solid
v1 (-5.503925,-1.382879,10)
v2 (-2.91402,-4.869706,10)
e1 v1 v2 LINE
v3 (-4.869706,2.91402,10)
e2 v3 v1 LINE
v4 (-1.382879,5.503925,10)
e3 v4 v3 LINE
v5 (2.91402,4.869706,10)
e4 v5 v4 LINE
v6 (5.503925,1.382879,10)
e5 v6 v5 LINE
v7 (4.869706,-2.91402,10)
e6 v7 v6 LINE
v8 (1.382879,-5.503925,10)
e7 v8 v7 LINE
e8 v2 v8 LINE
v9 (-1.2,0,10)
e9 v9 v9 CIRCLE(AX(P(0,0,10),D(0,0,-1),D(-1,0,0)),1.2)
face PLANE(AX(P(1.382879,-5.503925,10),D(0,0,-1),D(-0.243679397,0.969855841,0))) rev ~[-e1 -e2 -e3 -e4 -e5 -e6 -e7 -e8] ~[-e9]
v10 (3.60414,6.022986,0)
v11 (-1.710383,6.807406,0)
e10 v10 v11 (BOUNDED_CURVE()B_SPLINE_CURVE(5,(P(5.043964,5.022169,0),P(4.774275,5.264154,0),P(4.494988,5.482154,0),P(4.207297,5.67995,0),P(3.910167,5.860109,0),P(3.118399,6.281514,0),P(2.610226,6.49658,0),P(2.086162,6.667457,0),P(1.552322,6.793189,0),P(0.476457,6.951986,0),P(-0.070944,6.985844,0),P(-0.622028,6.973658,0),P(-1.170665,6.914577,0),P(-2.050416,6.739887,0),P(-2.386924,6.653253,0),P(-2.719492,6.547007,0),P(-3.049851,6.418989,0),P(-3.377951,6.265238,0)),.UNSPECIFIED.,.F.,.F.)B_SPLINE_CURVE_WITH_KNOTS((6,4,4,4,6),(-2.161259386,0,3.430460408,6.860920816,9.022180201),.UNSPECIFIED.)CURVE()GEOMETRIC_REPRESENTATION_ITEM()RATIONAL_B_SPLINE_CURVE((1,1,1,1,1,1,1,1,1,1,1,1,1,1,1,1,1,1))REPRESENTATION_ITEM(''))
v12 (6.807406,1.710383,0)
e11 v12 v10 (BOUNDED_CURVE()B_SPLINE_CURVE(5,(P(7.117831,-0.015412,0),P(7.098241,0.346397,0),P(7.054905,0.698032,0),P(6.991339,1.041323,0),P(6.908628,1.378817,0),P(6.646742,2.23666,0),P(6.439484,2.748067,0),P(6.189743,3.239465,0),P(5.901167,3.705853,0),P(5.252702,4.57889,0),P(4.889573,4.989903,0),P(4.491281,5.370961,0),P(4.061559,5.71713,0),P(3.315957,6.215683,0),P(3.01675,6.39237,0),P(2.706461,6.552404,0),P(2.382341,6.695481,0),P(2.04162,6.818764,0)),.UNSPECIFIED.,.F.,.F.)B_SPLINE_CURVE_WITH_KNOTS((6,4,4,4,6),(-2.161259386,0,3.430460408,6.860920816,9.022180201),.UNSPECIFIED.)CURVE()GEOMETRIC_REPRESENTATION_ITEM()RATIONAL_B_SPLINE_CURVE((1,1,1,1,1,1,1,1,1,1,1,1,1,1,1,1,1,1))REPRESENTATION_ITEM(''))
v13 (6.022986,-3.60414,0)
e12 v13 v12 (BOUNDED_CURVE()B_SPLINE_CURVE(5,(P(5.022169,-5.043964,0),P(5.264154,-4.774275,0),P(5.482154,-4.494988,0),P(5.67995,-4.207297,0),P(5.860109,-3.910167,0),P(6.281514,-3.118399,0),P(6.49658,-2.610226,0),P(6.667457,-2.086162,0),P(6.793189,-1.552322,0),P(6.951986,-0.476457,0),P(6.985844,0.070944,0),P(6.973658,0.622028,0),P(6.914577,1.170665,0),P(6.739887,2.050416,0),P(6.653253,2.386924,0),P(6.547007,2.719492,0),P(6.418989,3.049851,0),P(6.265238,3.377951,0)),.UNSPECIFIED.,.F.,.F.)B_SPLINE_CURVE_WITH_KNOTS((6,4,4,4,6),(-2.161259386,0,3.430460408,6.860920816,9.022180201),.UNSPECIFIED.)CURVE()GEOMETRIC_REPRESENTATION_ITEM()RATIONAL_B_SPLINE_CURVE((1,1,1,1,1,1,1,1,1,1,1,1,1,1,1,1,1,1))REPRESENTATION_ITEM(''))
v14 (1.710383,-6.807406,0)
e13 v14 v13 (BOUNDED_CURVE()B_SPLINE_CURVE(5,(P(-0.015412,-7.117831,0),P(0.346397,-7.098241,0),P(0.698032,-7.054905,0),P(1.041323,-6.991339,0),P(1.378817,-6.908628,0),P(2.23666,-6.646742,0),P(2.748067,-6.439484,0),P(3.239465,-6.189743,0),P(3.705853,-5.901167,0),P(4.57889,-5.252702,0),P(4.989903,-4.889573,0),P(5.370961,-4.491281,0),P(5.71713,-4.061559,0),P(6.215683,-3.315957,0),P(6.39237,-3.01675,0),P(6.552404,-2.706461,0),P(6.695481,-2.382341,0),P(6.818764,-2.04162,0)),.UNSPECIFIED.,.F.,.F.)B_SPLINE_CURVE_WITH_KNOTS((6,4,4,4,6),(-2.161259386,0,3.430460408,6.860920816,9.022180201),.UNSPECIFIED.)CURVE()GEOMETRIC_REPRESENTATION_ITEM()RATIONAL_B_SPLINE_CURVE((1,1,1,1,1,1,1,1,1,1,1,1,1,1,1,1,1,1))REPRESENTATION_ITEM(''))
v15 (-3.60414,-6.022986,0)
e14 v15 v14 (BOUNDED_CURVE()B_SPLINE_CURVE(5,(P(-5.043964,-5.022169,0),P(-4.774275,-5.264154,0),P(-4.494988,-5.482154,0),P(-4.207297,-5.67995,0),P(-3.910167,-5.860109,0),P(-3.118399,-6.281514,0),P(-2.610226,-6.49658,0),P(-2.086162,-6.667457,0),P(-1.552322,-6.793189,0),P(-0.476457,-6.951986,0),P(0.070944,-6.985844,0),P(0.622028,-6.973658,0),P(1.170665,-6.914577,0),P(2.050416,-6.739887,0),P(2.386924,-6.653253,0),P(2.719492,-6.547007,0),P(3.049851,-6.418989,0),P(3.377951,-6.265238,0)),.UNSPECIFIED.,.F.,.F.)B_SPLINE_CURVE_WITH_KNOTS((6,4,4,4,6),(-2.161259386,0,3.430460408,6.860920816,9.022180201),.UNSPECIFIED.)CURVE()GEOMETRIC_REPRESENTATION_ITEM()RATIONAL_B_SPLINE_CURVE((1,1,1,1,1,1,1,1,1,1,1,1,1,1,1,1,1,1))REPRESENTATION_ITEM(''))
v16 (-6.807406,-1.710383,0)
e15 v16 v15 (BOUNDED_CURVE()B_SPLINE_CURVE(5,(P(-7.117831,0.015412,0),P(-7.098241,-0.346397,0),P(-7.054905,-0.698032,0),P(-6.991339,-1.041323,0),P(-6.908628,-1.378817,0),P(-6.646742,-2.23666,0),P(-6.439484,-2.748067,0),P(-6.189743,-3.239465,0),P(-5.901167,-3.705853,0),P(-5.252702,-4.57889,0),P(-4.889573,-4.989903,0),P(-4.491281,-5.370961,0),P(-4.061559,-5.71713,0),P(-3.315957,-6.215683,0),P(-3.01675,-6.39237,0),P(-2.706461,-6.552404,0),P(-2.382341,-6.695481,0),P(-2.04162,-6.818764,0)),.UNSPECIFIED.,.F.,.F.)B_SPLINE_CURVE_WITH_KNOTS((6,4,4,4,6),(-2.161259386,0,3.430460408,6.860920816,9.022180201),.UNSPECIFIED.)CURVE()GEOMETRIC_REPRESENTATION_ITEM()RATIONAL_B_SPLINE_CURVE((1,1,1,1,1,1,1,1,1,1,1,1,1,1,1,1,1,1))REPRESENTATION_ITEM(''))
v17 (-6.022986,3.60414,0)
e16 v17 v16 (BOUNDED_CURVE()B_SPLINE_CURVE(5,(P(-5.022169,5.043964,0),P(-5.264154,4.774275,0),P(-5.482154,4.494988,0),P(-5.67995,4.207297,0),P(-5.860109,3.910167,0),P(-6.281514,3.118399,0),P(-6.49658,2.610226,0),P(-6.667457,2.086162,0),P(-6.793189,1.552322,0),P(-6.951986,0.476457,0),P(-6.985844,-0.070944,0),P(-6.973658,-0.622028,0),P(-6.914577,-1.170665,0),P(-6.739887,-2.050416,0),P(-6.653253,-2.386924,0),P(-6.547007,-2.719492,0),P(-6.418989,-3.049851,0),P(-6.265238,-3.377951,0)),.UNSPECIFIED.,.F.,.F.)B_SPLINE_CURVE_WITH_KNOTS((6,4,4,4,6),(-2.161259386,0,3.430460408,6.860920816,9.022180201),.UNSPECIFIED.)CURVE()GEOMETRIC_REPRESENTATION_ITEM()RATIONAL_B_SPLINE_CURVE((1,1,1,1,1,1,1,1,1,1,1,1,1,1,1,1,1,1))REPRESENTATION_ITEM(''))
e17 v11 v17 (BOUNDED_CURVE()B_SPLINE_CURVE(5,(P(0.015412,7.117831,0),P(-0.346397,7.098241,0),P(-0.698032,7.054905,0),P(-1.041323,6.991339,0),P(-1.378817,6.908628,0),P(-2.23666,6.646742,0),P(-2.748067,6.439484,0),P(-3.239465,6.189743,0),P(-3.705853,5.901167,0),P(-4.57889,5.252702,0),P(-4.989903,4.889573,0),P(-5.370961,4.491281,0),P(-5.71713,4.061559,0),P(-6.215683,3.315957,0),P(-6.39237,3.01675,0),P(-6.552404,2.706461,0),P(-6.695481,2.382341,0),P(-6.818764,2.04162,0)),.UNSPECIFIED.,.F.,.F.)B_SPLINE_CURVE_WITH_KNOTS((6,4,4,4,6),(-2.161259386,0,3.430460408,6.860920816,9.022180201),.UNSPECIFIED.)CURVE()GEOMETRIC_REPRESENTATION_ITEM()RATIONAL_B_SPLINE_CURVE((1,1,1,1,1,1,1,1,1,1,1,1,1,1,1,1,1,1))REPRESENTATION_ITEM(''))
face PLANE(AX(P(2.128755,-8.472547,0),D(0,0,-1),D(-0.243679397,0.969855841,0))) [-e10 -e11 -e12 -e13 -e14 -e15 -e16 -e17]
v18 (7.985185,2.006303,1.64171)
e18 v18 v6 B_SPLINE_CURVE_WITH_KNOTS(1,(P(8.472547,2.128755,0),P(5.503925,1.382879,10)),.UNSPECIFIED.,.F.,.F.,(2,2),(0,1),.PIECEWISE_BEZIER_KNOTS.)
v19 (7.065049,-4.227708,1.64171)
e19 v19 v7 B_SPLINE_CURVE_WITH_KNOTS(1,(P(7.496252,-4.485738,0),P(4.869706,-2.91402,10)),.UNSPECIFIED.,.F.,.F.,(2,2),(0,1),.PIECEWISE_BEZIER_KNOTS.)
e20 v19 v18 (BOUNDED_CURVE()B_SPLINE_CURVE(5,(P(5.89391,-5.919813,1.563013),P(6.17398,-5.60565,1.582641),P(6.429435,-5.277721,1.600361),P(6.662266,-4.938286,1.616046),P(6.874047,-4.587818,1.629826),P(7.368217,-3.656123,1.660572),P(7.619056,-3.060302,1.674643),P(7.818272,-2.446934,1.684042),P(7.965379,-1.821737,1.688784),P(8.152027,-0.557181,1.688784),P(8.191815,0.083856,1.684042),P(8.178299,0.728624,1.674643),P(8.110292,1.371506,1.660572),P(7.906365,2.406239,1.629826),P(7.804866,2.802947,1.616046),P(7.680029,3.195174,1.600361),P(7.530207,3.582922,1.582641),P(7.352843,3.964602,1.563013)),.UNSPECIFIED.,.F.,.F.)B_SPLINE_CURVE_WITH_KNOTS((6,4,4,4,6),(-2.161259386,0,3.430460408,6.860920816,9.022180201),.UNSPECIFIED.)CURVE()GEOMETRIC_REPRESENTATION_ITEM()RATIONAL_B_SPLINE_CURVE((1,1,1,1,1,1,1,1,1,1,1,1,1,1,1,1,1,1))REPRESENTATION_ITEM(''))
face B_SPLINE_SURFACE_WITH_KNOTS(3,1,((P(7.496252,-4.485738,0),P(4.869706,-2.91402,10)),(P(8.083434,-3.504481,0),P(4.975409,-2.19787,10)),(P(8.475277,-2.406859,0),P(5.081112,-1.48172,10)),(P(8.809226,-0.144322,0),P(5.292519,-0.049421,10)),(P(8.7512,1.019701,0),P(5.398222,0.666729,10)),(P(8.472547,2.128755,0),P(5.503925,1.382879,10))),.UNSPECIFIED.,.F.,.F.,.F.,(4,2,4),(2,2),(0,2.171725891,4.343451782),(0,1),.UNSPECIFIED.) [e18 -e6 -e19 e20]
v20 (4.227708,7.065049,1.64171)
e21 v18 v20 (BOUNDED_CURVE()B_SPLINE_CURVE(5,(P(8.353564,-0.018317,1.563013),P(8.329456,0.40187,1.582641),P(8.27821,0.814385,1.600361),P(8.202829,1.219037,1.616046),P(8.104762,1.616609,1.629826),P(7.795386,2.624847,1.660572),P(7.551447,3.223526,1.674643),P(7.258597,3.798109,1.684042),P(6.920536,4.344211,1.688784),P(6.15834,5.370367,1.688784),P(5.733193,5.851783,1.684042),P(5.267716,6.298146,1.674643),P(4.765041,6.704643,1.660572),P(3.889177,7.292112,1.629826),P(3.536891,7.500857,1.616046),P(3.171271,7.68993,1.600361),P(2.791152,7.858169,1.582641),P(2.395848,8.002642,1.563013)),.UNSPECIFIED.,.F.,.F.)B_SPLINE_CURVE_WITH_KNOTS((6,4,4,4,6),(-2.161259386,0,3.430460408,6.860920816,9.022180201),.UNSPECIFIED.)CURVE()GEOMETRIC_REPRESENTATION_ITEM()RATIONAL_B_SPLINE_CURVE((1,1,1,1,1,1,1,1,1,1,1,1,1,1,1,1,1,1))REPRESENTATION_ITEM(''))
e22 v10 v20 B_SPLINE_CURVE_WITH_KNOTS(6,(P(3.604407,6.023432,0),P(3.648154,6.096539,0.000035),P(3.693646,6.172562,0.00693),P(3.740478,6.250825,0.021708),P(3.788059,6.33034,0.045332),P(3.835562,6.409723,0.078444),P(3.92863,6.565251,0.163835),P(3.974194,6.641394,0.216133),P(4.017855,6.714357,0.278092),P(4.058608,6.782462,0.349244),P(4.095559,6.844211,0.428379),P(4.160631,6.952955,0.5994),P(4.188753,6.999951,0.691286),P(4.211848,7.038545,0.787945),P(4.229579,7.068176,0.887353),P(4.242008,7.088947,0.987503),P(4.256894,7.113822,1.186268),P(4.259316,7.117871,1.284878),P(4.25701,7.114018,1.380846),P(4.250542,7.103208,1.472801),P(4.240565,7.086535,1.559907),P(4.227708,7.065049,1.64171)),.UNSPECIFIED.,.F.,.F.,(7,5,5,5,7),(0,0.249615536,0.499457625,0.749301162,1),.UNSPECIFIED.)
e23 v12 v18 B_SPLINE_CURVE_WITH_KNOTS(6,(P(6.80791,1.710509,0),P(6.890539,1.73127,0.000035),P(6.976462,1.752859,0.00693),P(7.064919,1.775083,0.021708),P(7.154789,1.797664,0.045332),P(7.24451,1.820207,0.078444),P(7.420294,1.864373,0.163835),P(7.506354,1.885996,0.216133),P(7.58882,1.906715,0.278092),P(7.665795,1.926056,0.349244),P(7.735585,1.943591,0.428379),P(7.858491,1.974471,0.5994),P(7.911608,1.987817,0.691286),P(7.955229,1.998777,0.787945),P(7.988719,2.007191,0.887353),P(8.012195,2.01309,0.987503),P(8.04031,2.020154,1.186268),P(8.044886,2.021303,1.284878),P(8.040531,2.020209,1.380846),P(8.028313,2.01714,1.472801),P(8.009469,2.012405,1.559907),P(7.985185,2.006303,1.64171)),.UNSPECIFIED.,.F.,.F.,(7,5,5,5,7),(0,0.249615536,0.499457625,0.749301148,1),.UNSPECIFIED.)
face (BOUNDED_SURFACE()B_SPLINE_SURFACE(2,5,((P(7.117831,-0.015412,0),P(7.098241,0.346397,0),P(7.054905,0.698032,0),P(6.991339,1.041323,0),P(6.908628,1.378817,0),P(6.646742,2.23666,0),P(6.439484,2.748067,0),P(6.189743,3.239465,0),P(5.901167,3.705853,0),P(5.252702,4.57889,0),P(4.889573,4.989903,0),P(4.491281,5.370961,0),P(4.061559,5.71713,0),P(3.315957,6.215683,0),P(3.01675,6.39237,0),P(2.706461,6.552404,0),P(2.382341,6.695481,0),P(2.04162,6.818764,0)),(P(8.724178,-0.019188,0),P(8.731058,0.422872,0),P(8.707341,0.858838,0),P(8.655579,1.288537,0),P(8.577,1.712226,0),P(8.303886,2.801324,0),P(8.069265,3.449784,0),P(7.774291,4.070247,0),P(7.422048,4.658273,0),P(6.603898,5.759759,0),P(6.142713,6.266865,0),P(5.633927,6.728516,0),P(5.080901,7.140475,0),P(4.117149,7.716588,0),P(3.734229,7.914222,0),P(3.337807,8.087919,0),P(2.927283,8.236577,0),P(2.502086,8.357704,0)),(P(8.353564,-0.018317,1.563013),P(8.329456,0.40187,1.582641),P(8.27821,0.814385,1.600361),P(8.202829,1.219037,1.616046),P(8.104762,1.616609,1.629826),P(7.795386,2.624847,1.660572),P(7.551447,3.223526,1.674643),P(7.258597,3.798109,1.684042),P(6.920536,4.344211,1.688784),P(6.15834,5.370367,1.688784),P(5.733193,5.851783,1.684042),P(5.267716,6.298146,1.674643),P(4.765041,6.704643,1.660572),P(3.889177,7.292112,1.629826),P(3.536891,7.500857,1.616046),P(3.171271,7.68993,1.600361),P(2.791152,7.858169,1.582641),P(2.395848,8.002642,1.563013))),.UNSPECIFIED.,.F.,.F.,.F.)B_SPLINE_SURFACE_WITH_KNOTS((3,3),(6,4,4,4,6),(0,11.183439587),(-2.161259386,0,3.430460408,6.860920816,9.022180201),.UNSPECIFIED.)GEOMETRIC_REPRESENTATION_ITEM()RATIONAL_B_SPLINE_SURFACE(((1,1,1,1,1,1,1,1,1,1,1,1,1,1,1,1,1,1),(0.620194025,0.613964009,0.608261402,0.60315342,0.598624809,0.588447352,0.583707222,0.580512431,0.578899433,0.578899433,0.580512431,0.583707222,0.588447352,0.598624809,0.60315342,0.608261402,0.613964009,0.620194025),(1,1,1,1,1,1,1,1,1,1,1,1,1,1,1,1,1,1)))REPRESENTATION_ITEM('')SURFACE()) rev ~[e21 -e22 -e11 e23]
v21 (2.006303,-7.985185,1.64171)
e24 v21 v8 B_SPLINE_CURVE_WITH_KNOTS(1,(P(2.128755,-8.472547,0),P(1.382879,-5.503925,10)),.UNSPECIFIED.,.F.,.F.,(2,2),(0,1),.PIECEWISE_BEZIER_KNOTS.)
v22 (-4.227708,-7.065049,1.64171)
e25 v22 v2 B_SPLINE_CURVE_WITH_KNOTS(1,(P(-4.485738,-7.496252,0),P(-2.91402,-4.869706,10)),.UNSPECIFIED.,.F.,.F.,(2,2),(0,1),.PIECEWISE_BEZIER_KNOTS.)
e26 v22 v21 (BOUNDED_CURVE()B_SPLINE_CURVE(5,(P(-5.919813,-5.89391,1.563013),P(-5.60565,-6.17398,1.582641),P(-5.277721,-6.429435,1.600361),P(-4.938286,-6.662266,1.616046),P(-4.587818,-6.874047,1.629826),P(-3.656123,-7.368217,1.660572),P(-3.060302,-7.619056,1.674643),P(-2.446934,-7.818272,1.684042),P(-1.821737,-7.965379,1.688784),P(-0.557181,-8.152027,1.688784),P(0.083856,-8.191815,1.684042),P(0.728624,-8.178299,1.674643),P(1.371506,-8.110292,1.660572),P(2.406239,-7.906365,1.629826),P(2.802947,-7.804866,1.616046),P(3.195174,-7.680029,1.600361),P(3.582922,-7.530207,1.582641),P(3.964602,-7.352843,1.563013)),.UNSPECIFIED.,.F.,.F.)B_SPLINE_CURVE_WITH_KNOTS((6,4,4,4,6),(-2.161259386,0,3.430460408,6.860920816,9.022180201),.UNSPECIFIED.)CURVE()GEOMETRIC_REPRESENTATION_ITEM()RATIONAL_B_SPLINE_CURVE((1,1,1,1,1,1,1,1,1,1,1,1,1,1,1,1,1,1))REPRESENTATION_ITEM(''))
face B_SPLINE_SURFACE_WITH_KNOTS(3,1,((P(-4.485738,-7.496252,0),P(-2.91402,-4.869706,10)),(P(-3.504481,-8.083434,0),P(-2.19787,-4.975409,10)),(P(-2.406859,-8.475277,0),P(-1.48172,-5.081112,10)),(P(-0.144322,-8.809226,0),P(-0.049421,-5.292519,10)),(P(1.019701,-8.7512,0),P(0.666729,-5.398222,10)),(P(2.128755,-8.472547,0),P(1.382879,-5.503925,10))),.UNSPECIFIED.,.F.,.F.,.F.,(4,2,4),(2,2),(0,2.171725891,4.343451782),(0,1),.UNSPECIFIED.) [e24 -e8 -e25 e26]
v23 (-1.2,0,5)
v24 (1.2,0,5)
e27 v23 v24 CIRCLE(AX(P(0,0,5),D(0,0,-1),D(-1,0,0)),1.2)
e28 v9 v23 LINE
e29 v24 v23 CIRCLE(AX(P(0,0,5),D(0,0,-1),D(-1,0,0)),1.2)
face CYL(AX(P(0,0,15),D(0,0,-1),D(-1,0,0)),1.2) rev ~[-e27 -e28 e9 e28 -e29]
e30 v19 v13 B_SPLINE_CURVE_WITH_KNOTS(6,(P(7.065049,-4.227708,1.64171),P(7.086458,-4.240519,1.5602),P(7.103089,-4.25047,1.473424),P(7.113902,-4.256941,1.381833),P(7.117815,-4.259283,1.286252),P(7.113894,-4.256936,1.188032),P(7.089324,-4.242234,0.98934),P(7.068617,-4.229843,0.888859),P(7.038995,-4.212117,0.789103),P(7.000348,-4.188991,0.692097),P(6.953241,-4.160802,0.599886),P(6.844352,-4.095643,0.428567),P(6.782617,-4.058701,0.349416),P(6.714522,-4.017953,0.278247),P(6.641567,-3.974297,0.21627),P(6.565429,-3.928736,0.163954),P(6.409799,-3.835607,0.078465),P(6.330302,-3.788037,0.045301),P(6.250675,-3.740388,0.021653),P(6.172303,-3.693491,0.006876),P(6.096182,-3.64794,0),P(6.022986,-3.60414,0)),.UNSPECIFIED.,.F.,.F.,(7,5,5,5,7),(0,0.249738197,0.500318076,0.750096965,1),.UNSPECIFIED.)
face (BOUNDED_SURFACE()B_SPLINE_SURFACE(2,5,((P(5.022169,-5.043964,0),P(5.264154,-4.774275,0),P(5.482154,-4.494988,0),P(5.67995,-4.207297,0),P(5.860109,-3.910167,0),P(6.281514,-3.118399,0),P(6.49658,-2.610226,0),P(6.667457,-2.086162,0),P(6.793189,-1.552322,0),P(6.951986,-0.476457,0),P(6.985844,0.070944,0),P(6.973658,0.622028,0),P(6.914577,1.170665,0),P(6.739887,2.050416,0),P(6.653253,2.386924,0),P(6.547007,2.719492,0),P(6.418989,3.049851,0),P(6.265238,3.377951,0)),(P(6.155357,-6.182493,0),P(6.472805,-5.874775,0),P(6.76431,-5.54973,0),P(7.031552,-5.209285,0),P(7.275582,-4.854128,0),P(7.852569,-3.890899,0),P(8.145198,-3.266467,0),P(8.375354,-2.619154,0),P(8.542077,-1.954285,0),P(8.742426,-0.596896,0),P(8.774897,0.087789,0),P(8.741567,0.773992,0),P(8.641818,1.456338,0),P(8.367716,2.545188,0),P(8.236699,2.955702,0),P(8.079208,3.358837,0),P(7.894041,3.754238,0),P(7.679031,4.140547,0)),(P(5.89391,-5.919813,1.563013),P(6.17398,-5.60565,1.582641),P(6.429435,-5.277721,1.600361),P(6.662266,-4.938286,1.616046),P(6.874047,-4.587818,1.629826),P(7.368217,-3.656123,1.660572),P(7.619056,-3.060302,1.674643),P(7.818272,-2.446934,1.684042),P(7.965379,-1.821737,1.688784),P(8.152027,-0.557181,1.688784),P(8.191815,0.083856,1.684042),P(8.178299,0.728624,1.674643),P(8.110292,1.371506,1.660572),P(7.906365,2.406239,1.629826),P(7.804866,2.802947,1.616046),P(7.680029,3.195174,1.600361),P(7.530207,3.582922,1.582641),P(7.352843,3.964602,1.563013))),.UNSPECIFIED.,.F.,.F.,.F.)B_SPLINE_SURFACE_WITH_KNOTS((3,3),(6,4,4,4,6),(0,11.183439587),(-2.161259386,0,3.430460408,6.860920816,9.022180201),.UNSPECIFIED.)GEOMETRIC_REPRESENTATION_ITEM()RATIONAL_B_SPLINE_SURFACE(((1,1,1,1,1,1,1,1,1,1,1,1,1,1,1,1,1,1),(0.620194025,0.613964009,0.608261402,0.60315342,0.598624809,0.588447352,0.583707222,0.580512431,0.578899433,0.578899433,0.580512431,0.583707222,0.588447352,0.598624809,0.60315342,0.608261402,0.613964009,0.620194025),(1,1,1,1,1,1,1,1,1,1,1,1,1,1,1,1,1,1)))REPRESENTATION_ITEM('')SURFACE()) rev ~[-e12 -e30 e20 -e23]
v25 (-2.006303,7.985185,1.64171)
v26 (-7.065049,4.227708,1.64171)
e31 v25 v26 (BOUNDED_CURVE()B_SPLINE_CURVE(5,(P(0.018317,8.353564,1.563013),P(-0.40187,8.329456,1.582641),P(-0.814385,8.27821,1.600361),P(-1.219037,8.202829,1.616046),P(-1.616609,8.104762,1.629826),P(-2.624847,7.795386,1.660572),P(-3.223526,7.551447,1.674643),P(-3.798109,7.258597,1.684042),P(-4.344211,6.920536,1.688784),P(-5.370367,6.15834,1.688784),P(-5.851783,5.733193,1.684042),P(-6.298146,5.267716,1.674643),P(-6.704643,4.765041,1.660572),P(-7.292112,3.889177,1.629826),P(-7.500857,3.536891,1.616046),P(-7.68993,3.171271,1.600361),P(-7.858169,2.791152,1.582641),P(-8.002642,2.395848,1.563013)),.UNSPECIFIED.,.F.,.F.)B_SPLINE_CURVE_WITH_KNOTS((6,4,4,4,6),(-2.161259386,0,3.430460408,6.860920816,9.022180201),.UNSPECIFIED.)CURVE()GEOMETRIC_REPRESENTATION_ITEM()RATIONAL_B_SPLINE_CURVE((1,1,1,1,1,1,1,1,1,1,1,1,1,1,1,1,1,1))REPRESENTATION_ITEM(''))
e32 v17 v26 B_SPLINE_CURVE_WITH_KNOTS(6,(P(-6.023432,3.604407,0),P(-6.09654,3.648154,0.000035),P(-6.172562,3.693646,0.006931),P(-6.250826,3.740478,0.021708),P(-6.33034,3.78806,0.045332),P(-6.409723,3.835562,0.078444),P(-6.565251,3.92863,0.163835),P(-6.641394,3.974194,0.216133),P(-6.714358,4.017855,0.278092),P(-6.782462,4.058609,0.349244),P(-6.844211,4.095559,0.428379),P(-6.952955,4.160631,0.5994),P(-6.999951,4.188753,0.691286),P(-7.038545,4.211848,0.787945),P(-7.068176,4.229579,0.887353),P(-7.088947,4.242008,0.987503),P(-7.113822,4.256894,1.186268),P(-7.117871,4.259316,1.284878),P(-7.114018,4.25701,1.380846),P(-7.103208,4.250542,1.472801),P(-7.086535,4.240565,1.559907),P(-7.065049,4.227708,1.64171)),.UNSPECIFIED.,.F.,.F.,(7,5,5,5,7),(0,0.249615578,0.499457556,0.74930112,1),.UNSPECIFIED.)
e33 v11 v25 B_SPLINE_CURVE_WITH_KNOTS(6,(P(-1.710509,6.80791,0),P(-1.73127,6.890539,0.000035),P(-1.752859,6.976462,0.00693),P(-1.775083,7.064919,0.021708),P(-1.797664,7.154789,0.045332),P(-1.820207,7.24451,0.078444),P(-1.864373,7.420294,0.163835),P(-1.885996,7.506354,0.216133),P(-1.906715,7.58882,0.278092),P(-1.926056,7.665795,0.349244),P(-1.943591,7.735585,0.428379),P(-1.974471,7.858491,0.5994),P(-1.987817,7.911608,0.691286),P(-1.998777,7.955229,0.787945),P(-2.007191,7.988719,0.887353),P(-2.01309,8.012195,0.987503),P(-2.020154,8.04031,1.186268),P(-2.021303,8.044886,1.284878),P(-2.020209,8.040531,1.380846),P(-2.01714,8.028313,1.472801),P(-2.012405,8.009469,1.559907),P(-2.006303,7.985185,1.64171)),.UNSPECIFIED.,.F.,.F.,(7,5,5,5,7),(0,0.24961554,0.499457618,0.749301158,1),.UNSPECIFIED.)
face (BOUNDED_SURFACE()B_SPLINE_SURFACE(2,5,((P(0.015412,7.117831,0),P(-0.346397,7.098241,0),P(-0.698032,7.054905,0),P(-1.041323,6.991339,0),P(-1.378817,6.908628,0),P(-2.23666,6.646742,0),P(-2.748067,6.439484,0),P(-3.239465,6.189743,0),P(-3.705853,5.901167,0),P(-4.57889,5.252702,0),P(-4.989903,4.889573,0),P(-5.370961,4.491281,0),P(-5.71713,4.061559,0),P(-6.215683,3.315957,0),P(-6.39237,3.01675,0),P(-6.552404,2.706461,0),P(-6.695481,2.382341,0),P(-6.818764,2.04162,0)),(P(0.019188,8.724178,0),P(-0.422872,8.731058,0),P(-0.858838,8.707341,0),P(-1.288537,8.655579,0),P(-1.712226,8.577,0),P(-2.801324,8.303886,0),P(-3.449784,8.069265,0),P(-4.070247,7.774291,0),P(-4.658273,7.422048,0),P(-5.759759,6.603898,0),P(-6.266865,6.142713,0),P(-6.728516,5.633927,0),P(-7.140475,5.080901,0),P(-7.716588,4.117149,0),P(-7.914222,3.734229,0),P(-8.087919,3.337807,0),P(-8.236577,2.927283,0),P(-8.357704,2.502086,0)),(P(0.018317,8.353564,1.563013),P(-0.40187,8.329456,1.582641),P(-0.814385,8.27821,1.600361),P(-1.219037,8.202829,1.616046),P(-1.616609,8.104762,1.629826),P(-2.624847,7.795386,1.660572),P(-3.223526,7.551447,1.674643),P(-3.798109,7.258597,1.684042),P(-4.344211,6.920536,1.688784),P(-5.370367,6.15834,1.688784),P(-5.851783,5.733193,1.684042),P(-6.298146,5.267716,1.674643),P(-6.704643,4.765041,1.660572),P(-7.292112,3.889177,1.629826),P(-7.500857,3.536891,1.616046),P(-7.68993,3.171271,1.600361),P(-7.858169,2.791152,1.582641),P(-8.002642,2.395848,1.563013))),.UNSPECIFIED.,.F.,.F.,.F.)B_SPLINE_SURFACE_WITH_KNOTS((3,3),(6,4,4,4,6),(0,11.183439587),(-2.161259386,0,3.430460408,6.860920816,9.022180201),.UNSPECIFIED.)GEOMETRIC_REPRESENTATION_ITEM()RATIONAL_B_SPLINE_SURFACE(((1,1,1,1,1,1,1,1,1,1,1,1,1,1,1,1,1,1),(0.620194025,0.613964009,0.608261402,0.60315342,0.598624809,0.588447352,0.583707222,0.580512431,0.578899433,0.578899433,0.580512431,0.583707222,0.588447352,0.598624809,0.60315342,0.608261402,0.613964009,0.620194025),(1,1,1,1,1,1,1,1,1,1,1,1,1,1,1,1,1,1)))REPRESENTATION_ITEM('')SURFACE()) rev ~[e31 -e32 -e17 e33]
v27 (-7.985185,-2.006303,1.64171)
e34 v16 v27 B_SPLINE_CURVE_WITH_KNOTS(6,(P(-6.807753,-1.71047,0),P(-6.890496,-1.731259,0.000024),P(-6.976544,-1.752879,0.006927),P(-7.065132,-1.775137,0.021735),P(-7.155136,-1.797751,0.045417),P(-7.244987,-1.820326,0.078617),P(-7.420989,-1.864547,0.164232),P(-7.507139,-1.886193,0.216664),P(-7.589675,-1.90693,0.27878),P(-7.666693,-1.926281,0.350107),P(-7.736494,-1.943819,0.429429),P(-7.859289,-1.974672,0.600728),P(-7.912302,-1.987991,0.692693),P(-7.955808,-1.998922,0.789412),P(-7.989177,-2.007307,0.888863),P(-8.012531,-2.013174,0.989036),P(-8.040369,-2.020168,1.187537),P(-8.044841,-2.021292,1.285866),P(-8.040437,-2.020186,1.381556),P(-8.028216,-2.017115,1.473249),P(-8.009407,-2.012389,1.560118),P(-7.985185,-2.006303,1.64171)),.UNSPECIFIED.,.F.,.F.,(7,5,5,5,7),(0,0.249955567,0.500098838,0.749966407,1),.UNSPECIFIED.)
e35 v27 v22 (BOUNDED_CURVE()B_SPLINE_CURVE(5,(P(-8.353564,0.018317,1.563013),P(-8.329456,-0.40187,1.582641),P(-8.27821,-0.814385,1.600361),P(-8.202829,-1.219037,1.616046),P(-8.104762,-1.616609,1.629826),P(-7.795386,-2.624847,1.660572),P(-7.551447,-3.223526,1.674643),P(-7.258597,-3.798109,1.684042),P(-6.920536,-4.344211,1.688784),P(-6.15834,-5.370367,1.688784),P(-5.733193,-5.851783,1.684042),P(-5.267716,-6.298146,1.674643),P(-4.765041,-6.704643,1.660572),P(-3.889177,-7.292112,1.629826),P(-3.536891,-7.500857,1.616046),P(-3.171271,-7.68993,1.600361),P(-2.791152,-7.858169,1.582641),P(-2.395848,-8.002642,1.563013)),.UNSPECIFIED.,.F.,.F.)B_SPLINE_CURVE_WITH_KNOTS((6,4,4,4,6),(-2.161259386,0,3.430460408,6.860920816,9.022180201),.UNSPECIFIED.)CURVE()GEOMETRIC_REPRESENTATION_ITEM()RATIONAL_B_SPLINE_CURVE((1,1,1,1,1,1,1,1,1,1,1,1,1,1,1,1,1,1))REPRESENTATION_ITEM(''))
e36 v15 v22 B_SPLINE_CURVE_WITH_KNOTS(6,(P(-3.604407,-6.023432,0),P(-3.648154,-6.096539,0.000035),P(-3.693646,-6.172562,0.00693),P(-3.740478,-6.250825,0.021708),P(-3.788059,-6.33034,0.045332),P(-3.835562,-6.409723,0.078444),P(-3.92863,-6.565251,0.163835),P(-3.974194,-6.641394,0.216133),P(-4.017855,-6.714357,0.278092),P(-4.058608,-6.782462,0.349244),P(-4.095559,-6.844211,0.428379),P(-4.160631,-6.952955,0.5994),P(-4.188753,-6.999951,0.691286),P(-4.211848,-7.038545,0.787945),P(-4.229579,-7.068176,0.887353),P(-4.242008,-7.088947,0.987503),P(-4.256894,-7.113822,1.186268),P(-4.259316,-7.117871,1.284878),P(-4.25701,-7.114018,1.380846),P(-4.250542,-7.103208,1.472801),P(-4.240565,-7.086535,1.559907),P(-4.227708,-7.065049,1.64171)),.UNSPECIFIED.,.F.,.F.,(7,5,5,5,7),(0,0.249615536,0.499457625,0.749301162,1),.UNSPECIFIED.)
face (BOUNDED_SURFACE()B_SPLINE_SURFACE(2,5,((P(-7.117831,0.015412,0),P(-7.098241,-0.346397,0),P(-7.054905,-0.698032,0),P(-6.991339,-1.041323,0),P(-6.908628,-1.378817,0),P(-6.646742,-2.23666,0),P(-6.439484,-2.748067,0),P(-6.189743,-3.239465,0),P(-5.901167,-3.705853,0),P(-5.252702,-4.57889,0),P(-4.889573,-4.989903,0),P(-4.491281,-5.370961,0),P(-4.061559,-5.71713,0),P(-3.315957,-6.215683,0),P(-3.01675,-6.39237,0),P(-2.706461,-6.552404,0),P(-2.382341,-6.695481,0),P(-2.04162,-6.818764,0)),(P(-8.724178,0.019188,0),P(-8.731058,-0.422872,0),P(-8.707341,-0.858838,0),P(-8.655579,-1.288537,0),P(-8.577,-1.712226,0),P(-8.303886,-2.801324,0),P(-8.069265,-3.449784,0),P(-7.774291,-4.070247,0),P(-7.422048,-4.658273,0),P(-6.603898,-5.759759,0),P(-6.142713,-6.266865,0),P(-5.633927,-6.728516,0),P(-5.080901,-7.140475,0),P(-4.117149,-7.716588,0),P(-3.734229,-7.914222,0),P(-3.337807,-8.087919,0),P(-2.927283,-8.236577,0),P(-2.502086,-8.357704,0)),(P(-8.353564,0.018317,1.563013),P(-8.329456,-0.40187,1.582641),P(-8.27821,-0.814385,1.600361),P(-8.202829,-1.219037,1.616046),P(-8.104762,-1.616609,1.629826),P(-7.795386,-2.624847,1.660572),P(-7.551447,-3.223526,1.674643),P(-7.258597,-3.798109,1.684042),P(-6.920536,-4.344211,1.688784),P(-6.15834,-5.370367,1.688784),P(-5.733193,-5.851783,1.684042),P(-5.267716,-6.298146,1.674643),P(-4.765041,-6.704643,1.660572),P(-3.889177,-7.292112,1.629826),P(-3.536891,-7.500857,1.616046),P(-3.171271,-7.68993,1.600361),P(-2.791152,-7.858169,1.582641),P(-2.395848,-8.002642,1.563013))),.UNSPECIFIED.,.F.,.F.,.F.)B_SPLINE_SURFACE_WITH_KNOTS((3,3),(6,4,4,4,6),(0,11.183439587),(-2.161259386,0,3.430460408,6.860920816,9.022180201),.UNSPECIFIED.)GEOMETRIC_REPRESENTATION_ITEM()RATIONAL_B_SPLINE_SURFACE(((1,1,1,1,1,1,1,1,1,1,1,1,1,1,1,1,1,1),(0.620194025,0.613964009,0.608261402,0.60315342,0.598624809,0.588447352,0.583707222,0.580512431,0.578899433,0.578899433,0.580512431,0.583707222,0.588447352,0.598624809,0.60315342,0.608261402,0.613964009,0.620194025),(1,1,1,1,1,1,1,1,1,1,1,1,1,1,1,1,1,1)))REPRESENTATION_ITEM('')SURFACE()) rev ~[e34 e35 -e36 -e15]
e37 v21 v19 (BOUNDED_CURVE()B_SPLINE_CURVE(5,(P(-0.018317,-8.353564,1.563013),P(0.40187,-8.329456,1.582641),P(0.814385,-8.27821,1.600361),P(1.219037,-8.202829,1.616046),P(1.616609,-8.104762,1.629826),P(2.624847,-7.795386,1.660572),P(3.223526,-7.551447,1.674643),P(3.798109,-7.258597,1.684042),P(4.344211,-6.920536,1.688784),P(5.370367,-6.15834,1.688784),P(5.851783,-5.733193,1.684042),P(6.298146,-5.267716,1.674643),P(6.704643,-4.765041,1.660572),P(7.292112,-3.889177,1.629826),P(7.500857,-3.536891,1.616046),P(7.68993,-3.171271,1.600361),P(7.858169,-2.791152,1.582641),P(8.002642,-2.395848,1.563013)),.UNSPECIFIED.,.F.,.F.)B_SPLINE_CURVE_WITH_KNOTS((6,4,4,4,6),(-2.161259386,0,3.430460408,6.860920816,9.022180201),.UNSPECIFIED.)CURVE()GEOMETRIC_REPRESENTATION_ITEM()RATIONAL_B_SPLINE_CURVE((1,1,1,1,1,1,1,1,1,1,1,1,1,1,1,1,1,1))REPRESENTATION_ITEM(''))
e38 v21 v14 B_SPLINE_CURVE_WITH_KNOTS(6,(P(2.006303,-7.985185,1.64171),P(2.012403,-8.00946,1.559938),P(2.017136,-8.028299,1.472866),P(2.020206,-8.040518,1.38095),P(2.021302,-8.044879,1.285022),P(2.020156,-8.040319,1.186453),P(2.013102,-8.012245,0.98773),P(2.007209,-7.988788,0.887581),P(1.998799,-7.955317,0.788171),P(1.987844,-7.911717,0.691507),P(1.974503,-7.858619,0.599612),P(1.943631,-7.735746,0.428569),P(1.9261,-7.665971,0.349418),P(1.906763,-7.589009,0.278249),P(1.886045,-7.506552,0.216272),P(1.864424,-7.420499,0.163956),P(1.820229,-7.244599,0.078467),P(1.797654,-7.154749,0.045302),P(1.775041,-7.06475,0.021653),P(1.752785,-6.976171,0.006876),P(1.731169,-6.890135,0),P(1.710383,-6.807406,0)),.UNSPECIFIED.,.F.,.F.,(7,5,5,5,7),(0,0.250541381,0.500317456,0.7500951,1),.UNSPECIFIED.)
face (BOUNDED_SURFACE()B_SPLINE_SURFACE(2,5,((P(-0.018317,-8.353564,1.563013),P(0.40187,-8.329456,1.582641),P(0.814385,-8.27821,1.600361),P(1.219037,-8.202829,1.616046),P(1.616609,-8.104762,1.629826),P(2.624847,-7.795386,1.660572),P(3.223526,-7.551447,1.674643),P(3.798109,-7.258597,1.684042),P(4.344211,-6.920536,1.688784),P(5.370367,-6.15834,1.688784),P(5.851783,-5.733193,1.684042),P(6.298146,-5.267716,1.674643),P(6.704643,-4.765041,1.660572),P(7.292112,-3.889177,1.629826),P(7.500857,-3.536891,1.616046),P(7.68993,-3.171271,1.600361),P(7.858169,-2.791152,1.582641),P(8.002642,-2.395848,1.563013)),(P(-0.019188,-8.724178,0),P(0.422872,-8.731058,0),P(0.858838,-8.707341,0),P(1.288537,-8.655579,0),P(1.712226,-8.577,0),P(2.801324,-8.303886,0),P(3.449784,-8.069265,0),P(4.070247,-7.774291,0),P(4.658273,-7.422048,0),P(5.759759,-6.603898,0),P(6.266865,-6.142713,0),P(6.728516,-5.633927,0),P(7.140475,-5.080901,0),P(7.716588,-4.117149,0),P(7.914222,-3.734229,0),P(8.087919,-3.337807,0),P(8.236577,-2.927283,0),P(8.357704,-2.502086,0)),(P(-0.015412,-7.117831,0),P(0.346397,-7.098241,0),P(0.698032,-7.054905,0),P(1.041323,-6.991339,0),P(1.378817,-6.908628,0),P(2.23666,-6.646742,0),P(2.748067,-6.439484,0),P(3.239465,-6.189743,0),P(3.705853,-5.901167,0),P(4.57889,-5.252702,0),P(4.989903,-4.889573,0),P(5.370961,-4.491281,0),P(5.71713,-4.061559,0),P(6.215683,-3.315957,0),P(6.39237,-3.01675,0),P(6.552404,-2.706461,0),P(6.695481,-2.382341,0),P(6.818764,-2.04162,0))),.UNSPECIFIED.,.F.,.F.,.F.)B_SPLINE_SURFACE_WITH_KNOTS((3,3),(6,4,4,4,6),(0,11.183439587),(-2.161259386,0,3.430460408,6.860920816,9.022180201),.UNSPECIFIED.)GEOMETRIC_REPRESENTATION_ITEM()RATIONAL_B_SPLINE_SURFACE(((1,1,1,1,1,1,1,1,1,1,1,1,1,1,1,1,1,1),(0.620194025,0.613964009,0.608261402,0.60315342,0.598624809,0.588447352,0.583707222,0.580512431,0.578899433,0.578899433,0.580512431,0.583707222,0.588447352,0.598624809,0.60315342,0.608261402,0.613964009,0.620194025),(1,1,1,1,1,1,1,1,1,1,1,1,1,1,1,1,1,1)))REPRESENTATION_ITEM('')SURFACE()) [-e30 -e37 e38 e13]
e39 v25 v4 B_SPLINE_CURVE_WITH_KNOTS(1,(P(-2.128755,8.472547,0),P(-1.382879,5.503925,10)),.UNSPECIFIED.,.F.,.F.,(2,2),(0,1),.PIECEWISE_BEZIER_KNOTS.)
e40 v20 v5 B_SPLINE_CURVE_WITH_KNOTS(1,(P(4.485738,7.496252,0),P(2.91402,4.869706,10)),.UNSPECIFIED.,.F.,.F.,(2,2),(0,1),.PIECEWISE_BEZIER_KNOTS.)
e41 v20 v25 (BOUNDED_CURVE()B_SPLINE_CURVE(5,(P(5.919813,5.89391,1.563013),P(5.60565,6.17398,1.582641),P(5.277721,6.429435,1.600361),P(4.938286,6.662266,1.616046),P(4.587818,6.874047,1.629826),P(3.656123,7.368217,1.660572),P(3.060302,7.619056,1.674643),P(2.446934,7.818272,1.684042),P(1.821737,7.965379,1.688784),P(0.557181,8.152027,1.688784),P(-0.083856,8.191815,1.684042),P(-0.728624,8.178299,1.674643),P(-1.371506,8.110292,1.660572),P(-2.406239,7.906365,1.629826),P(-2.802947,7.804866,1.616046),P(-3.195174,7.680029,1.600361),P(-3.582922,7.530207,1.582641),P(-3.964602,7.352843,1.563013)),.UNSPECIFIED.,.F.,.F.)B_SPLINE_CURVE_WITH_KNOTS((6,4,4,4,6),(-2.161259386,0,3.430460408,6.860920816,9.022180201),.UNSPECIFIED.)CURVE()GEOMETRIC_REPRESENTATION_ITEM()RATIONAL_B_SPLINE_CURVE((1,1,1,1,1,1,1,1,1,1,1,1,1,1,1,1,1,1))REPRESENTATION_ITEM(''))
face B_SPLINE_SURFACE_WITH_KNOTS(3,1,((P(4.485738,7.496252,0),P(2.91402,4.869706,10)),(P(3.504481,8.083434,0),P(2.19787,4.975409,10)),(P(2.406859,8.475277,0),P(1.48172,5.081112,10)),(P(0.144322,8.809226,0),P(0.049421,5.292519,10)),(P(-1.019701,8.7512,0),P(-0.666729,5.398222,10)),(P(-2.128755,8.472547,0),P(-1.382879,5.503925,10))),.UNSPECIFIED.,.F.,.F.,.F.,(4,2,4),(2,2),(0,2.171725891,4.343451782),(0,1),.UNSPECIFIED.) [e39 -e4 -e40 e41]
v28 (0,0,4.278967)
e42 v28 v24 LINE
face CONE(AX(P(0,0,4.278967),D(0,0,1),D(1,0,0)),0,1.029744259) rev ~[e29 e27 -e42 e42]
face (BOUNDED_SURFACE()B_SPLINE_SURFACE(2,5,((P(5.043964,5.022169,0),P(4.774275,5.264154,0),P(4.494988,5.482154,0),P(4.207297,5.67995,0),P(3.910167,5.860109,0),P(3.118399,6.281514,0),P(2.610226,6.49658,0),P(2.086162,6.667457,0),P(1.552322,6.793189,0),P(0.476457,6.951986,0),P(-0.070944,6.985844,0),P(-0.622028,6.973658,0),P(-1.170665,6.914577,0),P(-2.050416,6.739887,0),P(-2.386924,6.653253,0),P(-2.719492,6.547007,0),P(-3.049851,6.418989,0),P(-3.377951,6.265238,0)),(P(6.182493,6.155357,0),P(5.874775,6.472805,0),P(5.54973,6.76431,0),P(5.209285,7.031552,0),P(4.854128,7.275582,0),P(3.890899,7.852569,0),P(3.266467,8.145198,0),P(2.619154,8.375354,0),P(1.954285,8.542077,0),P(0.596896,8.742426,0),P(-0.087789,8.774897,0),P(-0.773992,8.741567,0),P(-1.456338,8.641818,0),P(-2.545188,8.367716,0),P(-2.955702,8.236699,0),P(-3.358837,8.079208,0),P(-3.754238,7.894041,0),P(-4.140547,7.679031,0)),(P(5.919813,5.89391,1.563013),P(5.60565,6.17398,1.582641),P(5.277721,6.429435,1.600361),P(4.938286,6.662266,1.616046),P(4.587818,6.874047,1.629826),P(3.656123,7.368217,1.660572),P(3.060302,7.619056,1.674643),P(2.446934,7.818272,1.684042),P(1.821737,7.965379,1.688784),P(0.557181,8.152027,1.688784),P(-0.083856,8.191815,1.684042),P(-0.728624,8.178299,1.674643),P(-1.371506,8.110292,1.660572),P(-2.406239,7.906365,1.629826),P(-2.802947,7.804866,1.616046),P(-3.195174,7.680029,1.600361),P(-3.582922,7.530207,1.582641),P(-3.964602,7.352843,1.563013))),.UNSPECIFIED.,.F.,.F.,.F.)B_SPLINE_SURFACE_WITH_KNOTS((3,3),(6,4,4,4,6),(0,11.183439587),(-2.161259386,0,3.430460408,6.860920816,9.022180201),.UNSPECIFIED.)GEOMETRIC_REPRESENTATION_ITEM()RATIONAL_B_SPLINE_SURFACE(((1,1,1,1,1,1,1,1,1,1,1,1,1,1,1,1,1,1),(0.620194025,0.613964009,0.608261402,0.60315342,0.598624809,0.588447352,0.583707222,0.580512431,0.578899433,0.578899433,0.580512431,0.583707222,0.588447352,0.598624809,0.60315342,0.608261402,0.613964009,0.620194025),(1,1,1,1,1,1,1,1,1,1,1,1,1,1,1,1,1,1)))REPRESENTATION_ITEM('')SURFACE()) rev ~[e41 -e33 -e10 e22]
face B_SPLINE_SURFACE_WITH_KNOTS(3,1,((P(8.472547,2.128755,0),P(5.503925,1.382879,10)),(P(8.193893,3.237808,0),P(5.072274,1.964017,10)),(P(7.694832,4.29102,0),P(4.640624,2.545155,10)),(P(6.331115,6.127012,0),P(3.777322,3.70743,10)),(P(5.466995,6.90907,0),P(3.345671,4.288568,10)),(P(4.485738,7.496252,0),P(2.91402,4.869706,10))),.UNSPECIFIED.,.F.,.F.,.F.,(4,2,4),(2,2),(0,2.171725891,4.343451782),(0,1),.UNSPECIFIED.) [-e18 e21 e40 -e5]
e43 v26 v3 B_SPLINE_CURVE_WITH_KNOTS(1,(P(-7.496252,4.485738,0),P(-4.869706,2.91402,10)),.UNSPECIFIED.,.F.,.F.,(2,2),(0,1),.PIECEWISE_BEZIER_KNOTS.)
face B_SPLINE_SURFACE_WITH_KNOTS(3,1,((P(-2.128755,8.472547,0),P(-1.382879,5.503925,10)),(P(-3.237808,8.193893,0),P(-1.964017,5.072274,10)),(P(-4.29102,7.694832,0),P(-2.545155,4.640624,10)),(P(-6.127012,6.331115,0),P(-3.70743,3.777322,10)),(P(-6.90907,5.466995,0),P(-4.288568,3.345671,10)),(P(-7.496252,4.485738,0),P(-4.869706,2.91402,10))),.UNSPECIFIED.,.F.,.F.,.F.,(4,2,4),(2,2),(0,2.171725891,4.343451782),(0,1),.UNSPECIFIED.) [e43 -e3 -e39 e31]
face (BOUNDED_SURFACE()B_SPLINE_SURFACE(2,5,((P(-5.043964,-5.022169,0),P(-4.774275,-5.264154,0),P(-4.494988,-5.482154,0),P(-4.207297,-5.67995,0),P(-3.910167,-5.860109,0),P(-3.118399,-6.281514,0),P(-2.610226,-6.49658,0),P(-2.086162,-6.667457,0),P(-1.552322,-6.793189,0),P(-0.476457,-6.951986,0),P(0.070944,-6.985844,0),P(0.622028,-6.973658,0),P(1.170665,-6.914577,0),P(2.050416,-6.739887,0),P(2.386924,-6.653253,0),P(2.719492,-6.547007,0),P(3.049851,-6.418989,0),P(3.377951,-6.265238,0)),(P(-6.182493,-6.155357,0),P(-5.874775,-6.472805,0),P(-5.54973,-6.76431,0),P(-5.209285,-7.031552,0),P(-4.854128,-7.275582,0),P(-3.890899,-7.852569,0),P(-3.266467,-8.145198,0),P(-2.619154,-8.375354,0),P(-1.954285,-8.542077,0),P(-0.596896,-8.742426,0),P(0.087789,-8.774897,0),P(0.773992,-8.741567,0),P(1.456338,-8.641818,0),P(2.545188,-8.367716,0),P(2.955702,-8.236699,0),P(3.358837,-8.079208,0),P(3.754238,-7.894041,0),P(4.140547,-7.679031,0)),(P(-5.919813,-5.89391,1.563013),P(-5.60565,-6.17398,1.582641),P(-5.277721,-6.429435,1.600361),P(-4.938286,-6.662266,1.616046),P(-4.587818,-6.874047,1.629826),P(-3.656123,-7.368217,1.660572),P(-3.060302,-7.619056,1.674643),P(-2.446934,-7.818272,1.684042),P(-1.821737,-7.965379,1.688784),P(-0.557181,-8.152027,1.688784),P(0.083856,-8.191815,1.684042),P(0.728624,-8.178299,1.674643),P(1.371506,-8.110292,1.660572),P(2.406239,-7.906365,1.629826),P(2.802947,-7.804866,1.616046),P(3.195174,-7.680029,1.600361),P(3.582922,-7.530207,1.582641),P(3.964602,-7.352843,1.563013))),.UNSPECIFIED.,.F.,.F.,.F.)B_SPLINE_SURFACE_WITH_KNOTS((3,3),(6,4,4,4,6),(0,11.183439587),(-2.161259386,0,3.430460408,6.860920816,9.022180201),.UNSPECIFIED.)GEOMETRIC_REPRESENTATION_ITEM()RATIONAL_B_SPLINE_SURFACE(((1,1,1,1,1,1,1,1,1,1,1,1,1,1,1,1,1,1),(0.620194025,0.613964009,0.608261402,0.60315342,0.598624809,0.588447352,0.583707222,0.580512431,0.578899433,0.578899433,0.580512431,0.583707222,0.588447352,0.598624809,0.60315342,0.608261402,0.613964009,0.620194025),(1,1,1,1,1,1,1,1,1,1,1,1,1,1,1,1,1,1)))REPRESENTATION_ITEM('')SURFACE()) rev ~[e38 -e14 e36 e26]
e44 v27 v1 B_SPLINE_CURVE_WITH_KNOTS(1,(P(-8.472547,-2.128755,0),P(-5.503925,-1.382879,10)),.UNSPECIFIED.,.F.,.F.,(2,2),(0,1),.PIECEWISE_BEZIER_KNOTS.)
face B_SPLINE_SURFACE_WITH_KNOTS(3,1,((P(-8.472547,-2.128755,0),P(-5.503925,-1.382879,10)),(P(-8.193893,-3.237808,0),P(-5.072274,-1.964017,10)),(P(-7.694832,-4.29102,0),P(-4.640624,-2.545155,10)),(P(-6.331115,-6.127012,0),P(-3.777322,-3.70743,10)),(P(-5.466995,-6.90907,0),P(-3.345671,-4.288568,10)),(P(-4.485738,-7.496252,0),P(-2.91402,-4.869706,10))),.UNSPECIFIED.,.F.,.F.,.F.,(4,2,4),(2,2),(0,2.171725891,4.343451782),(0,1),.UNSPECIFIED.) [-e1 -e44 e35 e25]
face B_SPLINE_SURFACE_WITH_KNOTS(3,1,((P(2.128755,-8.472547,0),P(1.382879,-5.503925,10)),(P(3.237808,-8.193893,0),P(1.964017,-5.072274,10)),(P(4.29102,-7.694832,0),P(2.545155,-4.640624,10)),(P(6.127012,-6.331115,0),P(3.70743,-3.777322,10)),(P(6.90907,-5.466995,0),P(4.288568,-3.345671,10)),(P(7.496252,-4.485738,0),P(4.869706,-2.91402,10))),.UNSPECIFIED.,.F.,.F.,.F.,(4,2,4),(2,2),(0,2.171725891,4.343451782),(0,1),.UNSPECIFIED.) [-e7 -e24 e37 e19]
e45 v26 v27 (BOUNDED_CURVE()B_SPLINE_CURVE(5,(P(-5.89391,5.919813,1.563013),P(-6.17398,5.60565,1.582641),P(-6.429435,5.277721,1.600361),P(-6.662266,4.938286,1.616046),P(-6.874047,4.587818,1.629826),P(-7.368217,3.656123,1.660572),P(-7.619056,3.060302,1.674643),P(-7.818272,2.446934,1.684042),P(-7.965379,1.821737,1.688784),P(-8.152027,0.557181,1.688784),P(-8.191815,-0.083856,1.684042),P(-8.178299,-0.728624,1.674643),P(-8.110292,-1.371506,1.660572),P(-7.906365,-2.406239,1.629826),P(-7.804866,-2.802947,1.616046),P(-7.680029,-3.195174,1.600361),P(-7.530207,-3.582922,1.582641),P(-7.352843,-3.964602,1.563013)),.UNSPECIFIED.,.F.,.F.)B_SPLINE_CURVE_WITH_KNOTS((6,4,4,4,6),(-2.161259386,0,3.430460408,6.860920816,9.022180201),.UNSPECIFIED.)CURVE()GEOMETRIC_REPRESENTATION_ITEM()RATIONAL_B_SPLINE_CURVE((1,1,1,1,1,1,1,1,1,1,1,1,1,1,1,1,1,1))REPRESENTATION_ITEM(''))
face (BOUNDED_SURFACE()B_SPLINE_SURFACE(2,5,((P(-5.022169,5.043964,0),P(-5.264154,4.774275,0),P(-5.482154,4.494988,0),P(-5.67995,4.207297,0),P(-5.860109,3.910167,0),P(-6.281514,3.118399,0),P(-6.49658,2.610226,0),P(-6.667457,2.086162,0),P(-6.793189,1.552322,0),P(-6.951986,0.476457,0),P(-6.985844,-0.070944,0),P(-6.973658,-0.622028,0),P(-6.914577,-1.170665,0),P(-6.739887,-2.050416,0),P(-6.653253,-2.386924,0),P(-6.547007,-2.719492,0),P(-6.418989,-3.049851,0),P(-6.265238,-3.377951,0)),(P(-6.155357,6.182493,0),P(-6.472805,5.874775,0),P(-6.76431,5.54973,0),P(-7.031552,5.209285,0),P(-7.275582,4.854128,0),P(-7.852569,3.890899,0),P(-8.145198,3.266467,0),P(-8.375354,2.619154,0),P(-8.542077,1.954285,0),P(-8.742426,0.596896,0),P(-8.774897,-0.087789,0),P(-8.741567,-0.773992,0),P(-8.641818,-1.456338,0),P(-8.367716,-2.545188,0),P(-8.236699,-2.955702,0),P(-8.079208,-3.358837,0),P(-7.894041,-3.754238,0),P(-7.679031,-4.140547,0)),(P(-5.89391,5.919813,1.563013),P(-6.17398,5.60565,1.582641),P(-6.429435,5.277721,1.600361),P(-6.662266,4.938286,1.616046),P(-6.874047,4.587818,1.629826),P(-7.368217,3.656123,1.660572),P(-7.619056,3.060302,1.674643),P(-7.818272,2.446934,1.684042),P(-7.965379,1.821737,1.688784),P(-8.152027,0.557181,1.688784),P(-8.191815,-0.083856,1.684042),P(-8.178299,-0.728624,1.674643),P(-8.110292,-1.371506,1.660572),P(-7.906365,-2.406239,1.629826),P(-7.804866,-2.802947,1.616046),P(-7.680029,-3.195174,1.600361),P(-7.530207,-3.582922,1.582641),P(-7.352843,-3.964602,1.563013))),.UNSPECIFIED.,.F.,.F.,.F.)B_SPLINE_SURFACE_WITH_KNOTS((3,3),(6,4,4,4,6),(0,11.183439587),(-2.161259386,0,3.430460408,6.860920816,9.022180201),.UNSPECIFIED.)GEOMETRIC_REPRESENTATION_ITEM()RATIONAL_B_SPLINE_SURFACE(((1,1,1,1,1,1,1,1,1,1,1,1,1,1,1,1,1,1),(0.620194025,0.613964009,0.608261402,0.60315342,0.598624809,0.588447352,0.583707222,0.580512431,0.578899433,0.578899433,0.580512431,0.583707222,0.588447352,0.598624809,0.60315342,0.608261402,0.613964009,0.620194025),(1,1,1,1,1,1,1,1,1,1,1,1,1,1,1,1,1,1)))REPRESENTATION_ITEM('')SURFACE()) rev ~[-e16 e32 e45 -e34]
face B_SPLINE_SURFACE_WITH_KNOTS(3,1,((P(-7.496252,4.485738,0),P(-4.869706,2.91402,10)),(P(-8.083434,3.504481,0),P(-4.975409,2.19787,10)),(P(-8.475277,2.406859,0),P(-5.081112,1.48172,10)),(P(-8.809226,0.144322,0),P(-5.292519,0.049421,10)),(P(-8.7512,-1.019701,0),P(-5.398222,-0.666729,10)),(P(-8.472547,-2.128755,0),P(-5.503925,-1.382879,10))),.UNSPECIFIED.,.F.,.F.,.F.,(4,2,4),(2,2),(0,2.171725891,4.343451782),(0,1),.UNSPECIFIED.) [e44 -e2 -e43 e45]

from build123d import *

# Parameters (mm, degrees)
F4_D     = 2.4
F4_DEPTH = 5
F4_TIP   = 0.7210327428
F5_R     = 1.27


# Not quite as in the source:
# - the arcs of a loft's sections are written as splines that run evenly, so that the points pair up as in the source's solid


with BuildPart() as f3:
    # F0 (on Top) → F3 section 0
    with BuildSketch(Plane.XY):
        with BuildLine():
            add(Edge.make_bspline(
                [(2.1287545667, -8.4725466174), (3.2378083255, -8.1938932963), (4.2910199355, -7.694831903), (6.1270120531, -6.3311147047), (6.9090701762, -5.4669954641), (7.4962519567, -4.4857383775)],
                knots=[0, 0, 0, 0, 0.5, 0.5, 1, 1, 1, 1], degree=3))
            add(Edge.make_bspline(
                [(7.4962519567, -4.4857383775), (8.0834337372, -3.504481291), (8.4752771134, -2.4068585241), (8.8092259113, -0.144322369), (8.7511999386, 1.0197008079), (8.4725466174, 2.1287545667)],
                knots=[0, 0, 0, 0, 0.5, 0.5, 1, 1, 1, 1], degree=3))
            add(Edge.make_bspline(
                [(8.4725466174, 2.1287545667), (8.1938932963, 3.2378083255), (7.694831903, 4.2910199355), (6.3311147047, 6.1270120531), (5.4669954641, 6.9090701762), (4.4857383775, 7.4962519567)],
                knots=[0, 0, 0, 0, 0.5, 0.5, 1, 1, 1, 1], degree=3))
            add(Edge.make_bspline(
                [(4.4857383775, 7.4962519567), (3.504481291, 8.0834337372), (2.4068585241, 8.4752771134), (0.144322369, 8.8092259113), (-1.0197008079, 8.7511999386), (-2.1287545667, 8.4725466174)],
                knots=[0, 0, 0, 0, 0.5, 0.5, 1, 1, 1, 1], degree=3))
            add(Edge.make_bspline(
                [(-2.1287545667, 8.4725466174), (-3.2378083255, 8.1938932963), (-4.2910199355, 7.694831903), (-6.1270120531, 6.3311147047), (-6.9090701762, 5.4669954641), (-7.4962519567, 4.4857383775)],
                knots=[0, 0, 0, 0, 0.5, 0.5, 1, 1, 1, 1], degree=3))
            add(Edge.make_bspline(
                [(-7.4962519567, 4.4857383775), (-8.0834337372, 3.504481291), (-8.4752771134, 2.4068585241), (-8.8092259113, 0.144322369), (-8.7511999386, -1.0197008079), (-8.4725466174, -2.1287545667)],
                knots=[0, 0, 0, 0, 0.5, 0.5, 1, 1, 1, 1], degree=3))
            add(Edge.make_bspline(
                [(-8.4725466174, -2.1287545667), (-8.1938932963, -3.2378083255), (-7.694831903, -4.2910199355), (-6.3311147047, -6.1270120531), (-5.4669954641, -6.9090701762), (-4.4857383775, -7.4962519567)],
                knots=[0, 0, 0, 0, 0.5, 0.5, 1, 1, 1, 1], degree=3))
            add(Edge.make_bspline(
                [(-4.4857383775, -7.4962519567), (-3.504481291, -8.0834337372), (-2.4068585241, -8.4752771134), (-0.144322369, -8.8092259113), (1.0197008079, -8.7511999386), (2.1287545667, -8.4725466174)],
                knots=[0, 0, 0, 0, 0.5, 0.5, 1, 1, 1, 1], degree=3))
        make_face()
    # F2 (on offset) → F3 section 1
    with BuildSketch(Plane.XY.offset(10)):
        Polygon((1.3828789294, -5.5039253369), (4.8697059974, -2.9140198603), (5.5039253369, 1.3828789294), (2.9140198603, 4.8697059974), (-1.3828789294, 5.5039253369), (-4.8697059974, 2.9140198603), (-5.5039253369, -1.3828789294), (-2.9140198603, -4.8697059974), align=None)
    loft(ruled=True)

    # F4
    with Locations(Plane.XY.offset(10)):
        with Locations((0, 0)):
            Hole(F4_D / 2, depth=F4_DEPTH)
            with Locations((0, 0, -(F4_DEPTH + F4_TIP / 2))):  # 118° drill point
                Cone(0, F4_D / 2, F4_TIP, mode=Mode.SUBTRACT)

    # F5
    f5_edges = [f3.edges().sort_by_distance(p)[0] for p in [
        (5.209016, -7.012973, 0),
        (8.642252, -1.27559, 0),
        (7.012973, 5.209016, 0),
        (1.27559, 8.642252, 0),
        (-5.209016, 7.012973, 0),
        (-8.642252, 1.27559, 0),
        (-7.012973, -5.209016, 0),
        (-1.27559, -8.642252, 0),
    ]]
    fillet(f5_edges, radius=F5_R)


solid = f3.part
